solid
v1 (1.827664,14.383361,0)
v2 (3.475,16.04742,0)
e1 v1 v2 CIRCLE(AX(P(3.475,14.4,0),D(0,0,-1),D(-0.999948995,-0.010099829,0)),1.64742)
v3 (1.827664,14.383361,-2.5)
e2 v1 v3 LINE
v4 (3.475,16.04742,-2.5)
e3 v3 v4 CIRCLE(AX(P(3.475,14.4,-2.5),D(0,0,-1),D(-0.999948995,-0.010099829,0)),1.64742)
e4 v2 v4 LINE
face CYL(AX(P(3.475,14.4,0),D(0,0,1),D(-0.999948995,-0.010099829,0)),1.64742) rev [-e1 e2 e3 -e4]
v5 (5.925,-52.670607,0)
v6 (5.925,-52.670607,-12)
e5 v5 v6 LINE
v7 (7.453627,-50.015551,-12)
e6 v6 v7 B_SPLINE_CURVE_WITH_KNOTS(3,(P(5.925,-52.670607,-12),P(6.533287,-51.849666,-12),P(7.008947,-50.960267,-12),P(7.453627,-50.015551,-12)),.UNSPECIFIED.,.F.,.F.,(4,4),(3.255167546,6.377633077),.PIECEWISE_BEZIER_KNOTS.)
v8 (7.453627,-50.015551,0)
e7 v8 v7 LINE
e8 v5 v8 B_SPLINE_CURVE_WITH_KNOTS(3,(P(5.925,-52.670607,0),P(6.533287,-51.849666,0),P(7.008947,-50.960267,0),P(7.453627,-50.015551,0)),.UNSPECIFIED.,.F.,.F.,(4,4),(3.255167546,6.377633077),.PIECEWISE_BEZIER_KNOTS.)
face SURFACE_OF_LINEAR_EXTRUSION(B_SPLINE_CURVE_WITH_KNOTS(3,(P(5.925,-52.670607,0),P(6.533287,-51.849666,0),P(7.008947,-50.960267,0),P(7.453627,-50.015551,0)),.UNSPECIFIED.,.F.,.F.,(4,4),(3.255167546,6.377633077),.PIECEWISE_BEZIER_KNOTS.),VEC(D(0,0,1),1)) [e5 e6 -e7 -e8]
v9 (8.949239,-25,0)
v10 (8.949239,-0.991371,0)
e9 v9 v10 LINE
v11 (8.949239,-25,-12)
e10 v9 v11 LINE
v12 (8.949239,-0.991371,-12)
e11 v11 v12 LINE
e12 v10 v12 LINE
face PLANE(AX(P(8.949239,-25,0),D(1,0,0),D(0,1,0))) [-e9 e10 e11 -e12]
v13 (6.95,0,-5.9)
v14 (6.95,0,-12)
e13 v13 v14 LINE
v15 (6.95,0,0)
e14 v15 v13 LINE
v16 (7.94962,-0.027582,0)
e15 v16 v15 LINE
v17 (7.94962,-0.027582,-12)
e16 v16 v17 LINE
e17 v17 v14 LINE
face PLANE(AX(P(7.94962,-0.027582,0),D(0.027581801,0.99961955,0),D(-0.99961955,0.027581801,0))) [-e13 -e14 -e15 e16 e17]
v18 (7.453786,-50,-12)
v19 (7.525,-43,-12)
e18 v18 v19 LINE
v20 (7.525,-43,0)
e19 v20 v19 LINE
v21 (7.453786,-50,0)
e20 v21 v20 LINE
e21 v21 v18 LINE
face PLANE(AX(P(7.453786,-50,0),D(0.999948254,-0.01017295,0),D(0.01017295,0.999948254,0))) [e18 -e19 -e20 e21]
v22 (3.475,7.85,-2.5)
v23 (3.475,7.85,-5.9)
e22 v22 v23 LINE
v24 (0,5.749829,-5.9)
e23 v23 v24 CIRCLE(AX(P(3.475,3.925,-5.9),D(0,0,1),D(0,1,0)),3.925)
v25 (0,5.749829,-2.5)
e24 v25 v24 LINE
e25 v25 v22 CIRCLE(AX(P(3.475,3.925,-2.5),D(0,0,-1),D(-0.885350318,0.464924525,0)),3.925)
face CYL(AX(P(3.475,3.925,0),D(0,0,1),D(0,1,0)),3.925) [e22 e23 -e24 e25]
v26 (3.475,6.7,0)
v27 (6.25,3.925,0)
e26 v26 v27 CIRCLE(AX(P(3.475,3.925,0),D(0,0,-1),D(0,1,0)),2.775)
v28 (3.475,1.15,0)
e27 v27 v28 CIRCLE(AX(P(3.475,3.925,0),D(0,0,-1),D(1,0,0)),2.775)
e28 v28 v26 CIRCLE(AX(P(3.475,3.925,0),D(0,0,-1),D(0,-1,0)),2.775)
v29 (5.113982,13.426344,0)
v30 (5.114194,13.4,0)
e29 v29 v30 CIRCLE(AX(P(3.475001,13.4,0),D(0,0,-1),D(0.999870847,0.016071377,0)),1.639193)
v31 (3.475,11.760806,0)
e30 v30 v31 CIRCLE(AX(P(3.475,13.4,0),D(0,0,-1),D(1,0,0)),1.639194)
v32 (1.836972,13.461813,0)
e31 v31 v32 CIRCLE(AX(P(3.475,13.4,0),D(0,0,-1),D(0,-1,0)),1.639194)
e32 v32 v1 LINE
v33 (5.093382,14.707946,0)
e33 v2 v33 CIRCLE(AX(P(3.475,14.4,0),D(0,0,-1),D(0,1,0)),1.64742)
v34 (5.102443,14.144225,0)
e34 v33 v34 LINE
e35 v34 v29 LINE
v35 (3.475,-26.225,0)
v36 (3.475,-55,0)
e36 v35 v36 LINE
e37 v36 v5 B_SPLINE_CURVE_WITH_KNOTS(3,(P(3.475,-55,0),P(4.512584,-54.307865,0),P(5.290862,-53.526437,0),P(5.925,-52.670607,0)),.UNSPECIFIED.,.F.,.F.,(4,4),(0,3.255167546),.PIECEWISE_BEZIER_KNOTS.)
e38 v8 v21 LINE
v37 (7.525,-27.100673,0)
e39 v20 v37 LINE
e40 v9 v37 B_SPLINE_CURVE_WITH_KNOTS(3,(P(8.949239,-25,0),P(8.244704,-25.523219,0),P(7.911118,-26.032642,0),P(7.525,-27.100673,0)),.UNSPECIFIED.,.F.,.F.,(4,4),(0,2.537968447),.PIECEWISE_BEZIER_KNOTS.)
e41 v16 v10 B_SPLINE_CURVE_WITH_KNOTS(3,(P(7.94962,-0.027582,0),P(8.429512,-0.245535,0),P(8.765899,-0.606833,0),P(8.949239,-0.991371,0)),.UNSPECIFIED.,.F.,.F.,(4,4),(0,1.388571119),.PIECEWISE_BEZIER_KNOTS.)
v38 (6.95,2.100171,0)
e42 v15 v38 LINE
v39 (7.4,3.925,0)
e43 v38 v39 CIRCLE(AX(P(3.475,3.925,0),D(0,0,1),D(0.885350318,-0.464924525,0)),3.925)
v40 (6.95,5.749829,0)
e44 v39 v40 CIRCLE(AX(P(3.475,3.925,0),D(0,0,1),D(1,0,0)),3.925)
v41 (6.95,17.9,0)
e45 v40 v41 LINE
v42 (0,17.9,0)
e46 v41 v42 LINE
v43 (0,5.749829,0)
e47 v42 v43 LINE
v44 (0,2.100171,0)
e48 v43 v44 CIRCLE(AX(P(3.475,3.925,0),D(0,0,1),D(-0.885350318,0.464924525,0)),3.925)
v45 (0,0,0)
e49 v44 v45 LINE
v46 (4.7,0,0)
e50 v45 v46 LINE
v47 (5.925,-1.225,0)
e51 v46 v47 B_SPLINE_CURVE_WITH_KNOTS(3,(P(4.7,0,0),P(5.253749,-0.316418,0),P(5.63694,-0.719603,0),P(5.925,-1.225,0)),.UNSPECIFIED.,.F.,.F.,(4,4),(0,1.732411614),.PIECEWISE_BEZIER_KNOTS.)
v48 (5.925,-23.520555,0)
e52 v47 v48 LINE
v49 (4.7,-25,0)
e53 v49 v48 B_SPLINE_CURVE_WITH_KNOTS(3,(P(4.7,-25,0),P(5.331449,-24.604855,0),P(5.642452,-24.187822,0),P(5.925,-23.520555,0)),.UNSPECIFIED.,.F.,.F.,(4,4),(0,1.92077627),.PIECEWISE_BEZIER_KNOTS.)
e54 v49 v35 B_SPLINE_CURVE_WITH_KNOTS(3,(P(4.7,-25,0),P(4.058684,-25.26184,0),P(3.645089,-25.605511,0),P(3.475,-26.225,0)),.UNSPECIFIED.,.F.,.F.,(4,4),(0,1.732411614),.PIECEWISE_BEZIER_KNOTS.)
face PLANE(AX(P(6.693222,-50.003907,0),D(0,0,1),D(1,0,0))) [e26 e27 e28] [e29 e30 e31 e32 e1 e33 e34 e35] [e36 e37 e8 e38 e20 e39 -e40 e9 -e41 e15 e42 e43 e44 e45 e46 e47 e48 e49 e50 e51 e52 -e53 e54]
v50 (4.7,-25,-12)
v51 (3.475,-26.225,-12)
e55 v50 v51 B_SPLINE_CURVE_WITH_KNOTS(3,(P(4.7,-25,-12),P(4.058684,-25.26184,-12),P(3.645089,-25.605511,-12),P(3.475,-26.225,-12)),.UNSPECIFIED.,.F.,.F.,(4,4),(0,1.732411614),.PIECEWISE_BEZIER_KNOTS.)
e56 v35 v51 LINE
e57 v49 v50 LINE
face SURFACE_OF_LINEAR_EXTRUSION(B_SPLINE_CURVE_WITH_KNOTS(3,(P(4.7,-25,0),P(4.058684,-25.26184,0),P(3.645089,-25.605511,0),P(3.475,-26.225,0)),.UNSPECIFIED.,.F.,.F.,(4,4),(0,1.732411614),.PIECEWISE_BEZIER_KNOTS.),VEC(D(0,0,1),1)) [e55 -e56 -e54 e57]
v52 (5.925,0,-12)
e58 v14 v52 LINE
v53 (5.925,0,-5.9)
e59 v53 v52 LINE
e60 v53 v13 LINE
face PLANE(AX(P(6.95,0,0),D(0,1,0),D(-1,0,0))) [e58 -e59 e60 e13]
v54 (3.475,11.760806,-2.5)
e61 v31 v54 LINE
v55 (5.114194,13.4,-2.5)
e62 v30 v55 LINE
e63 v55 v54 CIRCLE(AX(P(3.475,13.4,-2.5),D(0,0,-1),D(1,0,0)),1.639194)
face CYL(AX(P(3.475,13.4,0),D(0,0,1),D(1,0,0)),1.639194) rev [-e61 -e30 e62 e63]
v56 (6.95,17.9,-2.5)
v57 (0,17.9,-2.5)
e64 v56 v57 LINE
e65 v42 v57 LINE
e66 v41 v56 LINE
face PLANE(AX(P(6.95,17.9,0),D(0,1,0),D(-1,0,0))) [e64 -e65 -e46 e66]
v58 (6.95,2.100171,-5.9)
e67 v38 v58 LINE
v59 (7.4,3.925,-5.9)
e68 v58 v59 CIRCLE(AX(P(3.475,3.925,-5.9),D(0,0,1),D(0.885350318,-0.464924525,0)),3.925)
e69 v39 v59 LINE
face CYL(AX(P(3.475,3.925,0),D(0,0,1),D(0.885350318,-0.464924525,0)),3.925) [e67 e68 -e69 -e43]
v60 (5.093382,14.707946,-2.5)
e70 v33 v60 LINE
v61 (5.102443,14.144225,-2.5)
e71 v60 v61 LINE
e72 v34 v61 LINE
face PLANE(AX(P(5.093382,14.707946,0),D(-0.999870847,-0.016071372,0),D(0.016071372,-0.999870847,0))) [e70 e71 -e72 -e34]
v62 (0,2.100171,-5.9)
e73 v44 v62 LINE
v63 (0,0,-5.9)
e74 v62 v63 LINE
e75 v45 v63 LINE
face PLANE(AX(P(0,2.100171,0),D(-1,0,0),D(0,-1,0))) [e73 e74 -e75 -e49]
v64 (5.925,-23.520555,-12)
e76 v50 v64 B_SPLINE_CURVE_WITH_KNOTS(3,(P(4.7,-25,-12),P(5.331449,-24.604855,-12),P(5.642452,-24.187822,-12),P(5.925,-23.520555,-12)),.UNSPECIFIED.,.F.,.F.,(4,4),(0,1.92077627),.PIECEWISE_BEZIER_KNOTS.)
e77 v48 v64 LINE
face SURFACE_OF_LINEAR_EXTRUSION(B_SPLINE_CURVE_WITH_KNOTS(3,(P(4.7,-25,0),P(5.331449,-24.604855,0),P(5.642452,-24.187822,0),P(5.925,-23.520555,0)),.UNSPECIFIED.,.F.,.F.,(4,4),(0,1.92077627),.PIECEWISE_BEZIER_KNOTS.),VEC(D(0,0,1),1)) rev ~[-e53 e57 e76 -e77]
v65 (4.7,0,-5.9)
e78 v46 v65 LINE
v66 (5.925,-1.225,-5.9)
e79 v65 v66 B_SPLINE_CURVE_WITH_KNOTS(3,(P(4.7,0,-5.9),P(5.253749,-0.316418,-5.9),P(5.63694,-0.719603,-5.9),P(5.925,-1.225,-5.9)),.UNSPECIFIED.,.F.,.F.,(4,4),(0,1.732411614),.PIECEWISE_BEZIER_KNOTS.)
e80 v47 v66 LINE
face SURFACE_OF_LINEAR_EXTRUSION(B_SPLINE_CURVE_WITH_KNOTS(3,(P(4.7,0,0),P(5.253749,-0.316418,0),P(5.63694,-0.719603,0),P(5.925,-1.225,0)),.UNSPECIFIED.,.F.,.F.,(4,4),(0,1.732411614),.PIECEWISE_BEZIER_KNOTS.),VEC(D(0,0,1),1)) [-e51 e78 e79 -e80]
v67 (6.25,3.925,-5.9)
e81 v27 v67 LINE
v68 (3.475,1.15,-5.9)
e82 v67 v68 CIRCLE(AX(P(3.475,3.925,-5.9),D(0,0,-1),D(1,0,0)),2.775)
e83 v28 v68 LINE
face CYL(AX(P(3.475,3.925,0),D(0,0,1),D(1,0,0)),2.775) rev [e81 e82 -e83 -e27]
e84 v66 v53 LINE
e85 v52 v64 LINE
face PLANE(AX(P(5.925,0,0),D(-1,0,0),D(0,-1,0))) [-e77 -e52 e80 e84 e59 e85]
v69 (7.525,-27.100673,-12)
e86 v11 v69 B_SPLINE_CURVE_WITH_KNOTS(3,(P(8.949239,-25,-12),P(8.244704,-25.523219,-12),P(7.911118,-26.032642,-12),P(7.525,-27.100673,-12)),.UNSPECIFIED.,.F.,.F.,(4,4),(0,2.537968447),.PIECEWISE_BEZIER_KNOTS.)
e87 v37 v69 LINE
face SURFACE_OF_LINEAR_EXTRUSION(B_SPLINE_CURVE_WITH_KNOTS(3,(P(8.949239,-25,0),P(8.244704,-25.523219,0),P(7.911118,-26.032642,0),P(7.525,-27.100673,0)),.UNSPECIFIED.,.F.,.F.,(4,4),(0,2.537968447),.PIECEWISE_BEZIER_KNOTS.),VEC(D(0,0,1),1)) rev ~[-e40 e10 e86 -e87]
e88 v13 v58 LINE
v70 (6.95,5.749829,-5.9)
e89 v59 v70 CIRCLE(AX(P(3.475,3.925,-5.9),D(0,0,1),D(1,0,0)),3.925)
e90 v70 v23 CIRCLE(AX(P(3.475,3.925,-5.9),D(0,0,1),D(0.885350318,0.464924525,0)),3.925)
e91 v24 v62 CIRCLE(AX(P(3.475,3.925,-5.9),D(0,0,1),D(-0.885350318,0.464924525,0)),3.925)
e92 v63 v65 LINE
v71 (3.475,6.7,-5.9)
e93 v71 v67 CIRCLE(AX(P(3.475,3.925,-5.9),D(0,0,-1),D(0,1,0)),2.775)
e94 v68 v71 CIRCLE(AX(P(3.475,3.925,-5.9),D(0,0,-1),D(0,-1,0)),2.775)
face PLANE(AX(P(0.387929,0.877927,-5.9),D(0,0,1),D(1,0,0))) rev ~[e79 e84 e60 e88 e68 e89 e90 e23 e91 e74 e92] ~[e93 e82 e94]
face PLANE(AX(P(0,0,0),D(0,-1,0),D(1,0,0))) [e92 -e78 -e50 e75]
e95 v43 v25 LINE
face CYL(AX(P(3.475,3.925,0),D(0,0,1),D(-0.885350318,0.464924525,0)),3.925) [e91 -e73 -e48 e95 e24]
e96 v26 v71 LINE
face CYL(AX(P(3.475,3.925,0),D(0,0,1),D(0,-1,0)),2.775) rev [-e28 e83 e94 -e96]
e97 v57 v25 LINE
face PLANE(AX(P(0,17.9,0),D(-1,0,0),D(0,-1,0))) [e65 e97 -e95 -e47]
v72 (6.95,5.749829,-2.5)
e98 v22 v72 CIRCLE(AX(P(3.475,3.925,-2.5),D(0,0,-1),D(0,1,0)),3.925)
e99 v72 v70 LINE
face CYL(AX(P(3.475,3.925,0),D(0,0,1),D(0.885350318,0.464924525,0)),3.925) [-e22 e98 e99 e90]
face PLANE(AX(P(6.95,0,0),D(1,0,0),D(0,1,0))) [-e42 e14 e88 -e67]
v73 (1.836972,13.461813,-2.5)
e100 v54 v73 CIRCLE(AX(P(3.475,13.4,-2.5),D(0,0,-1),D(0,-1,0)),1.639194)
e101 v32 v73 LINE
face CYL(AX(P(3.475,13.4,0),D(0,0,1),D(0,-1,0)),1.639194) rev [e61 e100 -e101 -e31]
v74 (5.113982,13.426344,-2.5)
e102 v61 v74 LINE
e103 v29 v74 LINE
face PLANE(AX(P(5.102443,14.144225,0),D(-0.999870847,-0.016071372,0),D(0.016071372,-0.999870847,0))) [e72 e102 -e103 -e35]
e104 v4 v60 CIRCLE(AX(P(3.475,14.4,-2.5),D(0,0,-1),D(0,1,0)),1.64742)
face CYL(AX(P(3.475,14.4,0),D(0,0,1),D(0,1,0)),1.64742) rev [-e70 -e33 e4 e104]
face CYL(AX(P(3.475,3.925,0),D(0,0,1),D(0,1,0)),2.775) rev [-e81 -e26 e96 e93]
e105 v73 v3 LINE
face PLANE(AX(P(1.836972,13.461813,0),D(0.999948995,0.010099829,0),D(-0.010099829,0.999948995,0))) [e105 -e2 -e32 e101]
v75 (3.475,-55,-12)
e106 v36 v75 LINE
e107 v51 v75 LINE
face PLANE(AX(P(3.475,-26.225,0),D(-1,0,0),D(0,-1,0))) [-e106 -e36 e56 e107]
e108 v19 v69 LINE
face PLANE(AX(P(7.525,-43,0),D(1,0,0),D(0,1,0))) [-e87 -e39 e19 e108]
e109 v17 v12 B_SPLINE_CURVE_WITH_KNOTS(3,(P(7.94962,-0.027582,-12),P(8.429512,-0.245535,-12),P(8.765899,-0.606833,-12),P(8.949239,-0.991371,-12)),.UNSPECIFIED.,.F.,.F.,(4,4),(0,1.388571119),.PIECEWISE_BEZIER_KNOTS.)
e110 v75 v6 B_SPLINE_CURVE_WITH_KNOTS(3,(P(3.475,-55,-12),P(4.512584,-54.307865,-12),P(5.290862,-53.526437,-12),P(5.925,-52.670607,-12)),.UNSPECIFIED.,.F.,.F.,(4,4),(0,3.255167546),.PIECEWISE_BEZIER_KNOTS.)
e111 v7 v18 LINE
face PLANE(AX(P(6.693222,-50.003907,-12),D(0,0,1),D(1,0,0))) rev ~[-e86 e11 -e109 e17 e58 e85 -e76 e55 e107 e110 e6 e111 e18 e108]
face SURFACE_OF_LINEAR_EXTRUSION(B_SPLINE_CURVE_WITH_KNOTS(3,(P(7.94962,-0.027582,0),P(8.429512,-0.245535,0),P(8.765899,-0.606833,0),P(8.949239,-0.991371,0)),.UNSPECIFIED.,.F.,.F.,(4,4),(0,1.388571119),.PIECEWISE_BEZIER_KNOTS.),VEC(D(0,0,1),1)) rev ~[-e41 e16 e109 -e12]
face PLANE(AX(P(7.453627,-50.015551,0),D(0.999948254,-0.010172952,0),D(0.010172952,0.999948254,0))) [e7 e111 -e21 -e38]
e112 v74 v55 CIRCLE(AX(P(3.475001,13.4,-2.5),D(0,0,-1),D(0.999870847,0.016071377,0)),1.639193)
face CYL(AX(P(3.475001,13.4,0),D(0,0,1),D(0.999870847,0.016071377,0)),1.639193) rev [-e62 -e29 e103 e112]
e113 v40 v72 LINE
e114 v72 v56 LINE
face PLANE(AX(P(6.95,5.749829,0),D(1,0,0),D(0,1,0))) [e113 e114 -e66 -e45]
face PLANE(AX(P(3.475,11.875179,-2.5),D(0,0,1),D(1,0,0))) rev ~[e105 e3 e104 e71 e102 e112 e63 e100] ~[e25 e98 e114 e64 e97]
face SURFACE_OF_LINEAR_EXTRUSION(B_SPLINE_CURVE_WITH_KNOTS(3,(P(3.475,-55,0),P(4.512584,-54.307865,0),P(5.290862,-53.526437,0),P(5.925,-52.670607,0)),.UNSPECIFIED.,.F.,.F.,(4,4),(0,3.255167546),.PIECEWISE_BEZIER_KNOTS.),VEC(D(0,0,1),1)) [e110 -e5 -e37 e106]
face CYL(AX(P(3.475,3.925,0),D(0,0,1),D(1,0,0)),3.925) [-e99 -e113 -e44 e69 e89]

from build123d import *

# Parameters (mm, degrees)
F1_DEPTH = 5.9
F2_DEPTH = 2.5
F3_DEPTH = 12
F4_DEPTH = 12


with BuildPart() as f1:
    # F0 (on Top) → F1 (new body)
    with BuildSketch(Plane.XY):
        with BuildLine():
            Line((0, 2.1001712409), (0, 0))
            Line((0, 0), (1.025, 0))
            Line((1.025, 0), (1.025, 0.8585484677))
            ThreePointArc((1.025, 0.8585484677), (0.4481513041, 1.426237912), (0, 2.1001712409))
        make_face()
        with BuildLine():
            Line((1.025, 0.8585484677), (1.025, 0))
            Line((1.025, 0), (3.475, 0))
            ThreePointArc((3.475, 0), (2.1769624937, 0.2208504846), (1.025, 0.8585484677))
        make_face()
        with BuildLine():
            ThreePointArc((0, 5.7498287591), (-0.45, 3.925), (0, 2.1001712409))
            Line((0, 2.1001712409), (0, 5.7498287591))
        make_face()
        with BuildLine():
            Line((0, 5.7498287591), (0, 2.1001712409))
            ThreePointArc((0, 2.1001712409), (0.4481513041, 1.426237912), (1.025, 0.8585484677))
            ThreePointArc((1.025, 0.8585484677), (2.1769624937, 0.2208504846), (3.475, 0))
            Line((3.475, 0), (3.475, 1.15))
            ThreePointArc((3.475, 1.15), (0.7, 3.925), (3.475, 6.7))
            Line((3.475, 6.7), (3.475, 6.8908035755))
            Line((3.475, 6.8908035755), (3.475, 7.85))
            ThreePointArc((3.475, 7.85), (1.4448310267, 7.2841723593), (0, 5.7498287591))
        make_face()
        with BuildLine():
            ThreePointArc((5.925, 0.8585484677), (4.7730375063, 0.2208504846), (3.475, 0))
            Line((3.475, 0), (4.7, 0))
            Line((4.7, 0), (5.925, 0))
            Line((5.925, 0), (5.925, 0.8585484677))
        make_face()
        with BuildLine():
            Line((3.475, 1.15), (3.475, 0))
            ThreePointArc((3.475, 0), (4.7730375063, 0.2208504846), (5.925, 0.8585484677))
            ThreePointArc((5.925, 0.8585484677), (6.5018486959, 1.426237912), (6.95, 2.1001712409))
            Line((6.95, 2.1001712409), (6.95, 5.7498287591))
            ThreePointArc((6.95, 5.7498287591), (5.5051689733, 7.2841723593), (3.475, 7.85))
            Line((3.475, 7.85), (3.475, 6.8908035755))
            Line((3.475, 6.8908035755), (3.475, 6.7))
            ThreePointArc((3.475, 6.7), (5.4372213178, 5.8872213178), (6.25, 3.925))
            ThreePointArc((6.25, 3.925), (5.4372213178, 1.9627786822), (3.475, 1.15))
        make_face()
        with BuildLine():
            Line((5.925, 0), (4.7, 0))
            add(Edge.make_bspline(
                [(4.7, 0), (5.2537494339, -0.3164176305), (5.6369397789, -0.7196032093), (5.925, -1.225)],
                knots=[0, 0, 0, 0, 1.7324116139, 1.7324116139, 1.7324116139, 1.7324116139], degree=3))
            Line((5.925, -1.225), (5.925, -0.079424061))
            Line((5.925, -0.079424061), (5.925, 0))
        make_face()
        with BuildLine():
            ThreePointArc((6.95, 2.1001712409), (6.5018486959, 1.426237912), (5.925, 0.8585484677))
            Line((5.925, 0.8585484677), (5.925, 0))
            Line((5.925, 0), (6.95, 0))
            Line((6.95, 0), (6.95, 0.75))
            Line((6.95, 0.75), (6.95, 1.44))
            Line((6.95, 1.44), (6.95, 1.5))
            Line((6.95, 1.5), (6.95, 2.1001712409))
        make_face()
        with BuildLine():
            Line((6.95, 5.7498287591), (6.95, 2.1001712409))
            ThreePointArc((6.95, 2.1001712409), (7.2858398025, 2.9852526935), (7.4, 3.925))
            ThreePointArc((7.4, 3.925), (7.2858398025, 4.8647473065), (6.95, 5.7498287591))
        make_face()
    extrude(amount=-F1_DEPTH)

    # F0 (on Top) → F2 (join)
    with BuildSketch(Plane.XY):
        with BuildLine():
            Line((0, 7.85), (0, 5.7498287591))
            ThreePointArc((0, 5.7498287591), (1.4448310267, 7.2841723593), (3.475, 7.85))
            ThreePointArc((3.475, 7.85), (5.5051689733, 7.2841723593), (6.95, 5.7498287591))
            Line((6.95, 5.7498287591), (6.95, 17.9))
            Line((6.95, 17.9), (3.475, 17.9))
            Line((3.475, 17.9), (0, 17.9))
            Line((0, 17.9), (0, 7.85))
        make_face()
        with BuildLine():
            ThreePointArc((1.8276640256, 14.3833613398), (2.3042302705, 15.55900427), (3.475, 16.0474200003))
            ThreePointArc((3.475, 16.0474200003), (4.5253988967, 15.6691157612), (5.0933824344, 14.7079463483))
            Line((5.0933824344, 14.7079463483), (5.1024433757, 14.1442252627))
            Line((5.1024433757, 14.1442252627), (5.113982201, 13.4263440945))
            ThreePointArc((5.113982201, 13.4263440945), (5.1141409801, 13.4131724726), (5.1141939076, 13.4))
            ThreePointArc((5.1141939076, 13.4), (4.6340851277, 12.2409148723), (3.475, 11.7608060924))
            ThreePointArc((3.475, 11.7608060924), (2.2942628451, 12.2629791393), (1.8369719791, 13.4618131819))
            Line((1.8369719791, 13.4618131819), (1.8276640256, 14.3833613398))
        make_face(mode=Mode.SUBTRACT)
    extrude(amount=-F2_DEPTH)

    # F0 (on Top) → F3 (join)
    with BuildSketch(Plane.XY):
        with BuildLine():
            Line((6.95, 0), (5.925, 0))
            Line((5.925, 0), (5.925, -0.079424061))
            Line((5.925, -0.079424061), (5.925, -1.225))
            Line((5.925, -1.225), (5.925, -21.3844068348))
            Line((5.925, -21.3844068348), (5.925, -22.55))
            Line((5.925, -22.55), (5.925, -22.9875))
            Line((5.925, -22.9875), (5.925, -23.5205553472))
            Line((5.925, -23.5205553472), (5.925, -25))
            Line((5.925, -25), (7.525, -25))
            Line((7.525, -25), (8.9492390995, -25))
            Line((8.9492390995, -25), (8.9492390995, -0.9913714603))
            add(Edge.make_bspline(
                [(7.9496195498, -0.0275818011), (8.4295123816, -0.2455351059), (8.7658986449, -0.6068330258), (8.9492390995, -0.9913714603)],
                knots=[0, 0, 0, 0, 1.3885711186, 1.3885711186, 1.3885711186, 1.3885711186], degree=3))
            Line((7.9496195498, -0.0275818011), (6.95, 0))
        make_face()
        with BuildLine():
            add(Edge.make_bspline(
                [(4.7, -25), (4.0586842224, -25.2618398517), (3.6450892221, -25.6055109203), (3.475, -26.225)],
                knots=[0, 0, 0, 0, 1.7324116139, 1.7324116139, 1.7324116139, 1.7324116139], degree=3))
            Line((3.475, -26.225), (3.475, -48.775))
            Line((3.475, -48.775), (3.475, -50))
            Line((3.475, -50), (5.925, -50))
            Line((5.925, -50), (5.925, -47.55))
            Line((5.925, -47.55), (5.925, -43))
            Line((5.925, -43), (5.925, -28.903))
            Line((5.925, -28.903), (5.925, -26.9515))
            Line((5.925, -26.9515), (5.925, -25))
            Line((5.925, -25), (4.7, -25))
        make_face()
        with BuildLine():
            add(Edge.make_bspline(
                [(4.7, -25), (5.3314492106, -24.6048551053), (5.6424522772, -24.1878218949), (5.925, -23.5205553472)],
                knots=[0, 0, 0, 0, 1.9207762703, 1.9207762703, 1.9207762703, 1.9207762703], degree=3))
            Line((4.7, -25), (5.925, -25))
            Line((5.925, -25), (5.925, -23.5205553472))
        make_face()
        Polygon((7.525, -25), (5.925, -25), (5.925, -26.9515), (5.925, -28.903), (5.925, -43), (7.525, -43), (7.525, -27.1006729454), align=None)
        with BuildLine():
            add(Edge.make_bspline(
                [(8.9492390995, -25), (8.2447035238, -25.5232192576), (7.9111177474, -26.03264153), (7.525, -27.1006729454)],
                knots=[0, 0, 0, 0, 2.5379684466, 2.5379684466, 2.5379684466, 2.5379684466], degree=3))
            Line((8.9492390995, -25), (7.525, -25))
            Line((7.525, -25), (7.525, -27.1006729454))
        make_face()
        with BuildLine():
            Line((5.925, -50), (3.475, -50))
            Line((3.475, -50), (3.475, -55))
            add(Edge.make_bspline(
                [(3.475, -55), (4.512583722, -54.3078648135), (5.2908616095, -53.5264365704), (5.925, -52.6706067544)],
                knots=[0, 0, 0, 0, 3.2551675464, 3.2551675464, 3.2551675464, 3.2551675464], degree=3))
            Line((5.925, -52.6706067544), (5.925, -52.0125))
            Line((5.925, -52.0125), (5.925, -50))
        make_face()
        with BuildLine():
            Line((7.4536274492, -50.0155514561), (5.925, -50))
            Line((5.925, -50), (5.925, -52.0125))
            Line((5.925, -52.0125), (5.925, -52.6706067544))
            add(Edge.make_bspline(
                [(5.925, -52.6706067544), (6.5332867434, -51.8496661845), (7.0089465882, -50.9602665865), (7.4536274492, -50.0155514561)],
                knots=[3.2551675464, 3.2551675464, 3.2551675464, 3.2551675464, 6.3776330772, 6.3776330772, 6.3776330772, 6.3776330772], degree=3))
        make_face()
        Polygon((5.925, -47.55), (5.925, -50), (7.4537856616, -50), (7.525, -43), (5.925, -43), align=None)
    extrude(amount=-F3_DEPTH)

    # F0 (on Top) → F4 (join)
    with BuildSketch(Plane.XY):
        Polygon((7.4537856616, -50), (5.925, -50), (7.4536274492, -50.0155514561), align=None)
    extrude(amount=-F4_DEPTH)


solid = f1.part
